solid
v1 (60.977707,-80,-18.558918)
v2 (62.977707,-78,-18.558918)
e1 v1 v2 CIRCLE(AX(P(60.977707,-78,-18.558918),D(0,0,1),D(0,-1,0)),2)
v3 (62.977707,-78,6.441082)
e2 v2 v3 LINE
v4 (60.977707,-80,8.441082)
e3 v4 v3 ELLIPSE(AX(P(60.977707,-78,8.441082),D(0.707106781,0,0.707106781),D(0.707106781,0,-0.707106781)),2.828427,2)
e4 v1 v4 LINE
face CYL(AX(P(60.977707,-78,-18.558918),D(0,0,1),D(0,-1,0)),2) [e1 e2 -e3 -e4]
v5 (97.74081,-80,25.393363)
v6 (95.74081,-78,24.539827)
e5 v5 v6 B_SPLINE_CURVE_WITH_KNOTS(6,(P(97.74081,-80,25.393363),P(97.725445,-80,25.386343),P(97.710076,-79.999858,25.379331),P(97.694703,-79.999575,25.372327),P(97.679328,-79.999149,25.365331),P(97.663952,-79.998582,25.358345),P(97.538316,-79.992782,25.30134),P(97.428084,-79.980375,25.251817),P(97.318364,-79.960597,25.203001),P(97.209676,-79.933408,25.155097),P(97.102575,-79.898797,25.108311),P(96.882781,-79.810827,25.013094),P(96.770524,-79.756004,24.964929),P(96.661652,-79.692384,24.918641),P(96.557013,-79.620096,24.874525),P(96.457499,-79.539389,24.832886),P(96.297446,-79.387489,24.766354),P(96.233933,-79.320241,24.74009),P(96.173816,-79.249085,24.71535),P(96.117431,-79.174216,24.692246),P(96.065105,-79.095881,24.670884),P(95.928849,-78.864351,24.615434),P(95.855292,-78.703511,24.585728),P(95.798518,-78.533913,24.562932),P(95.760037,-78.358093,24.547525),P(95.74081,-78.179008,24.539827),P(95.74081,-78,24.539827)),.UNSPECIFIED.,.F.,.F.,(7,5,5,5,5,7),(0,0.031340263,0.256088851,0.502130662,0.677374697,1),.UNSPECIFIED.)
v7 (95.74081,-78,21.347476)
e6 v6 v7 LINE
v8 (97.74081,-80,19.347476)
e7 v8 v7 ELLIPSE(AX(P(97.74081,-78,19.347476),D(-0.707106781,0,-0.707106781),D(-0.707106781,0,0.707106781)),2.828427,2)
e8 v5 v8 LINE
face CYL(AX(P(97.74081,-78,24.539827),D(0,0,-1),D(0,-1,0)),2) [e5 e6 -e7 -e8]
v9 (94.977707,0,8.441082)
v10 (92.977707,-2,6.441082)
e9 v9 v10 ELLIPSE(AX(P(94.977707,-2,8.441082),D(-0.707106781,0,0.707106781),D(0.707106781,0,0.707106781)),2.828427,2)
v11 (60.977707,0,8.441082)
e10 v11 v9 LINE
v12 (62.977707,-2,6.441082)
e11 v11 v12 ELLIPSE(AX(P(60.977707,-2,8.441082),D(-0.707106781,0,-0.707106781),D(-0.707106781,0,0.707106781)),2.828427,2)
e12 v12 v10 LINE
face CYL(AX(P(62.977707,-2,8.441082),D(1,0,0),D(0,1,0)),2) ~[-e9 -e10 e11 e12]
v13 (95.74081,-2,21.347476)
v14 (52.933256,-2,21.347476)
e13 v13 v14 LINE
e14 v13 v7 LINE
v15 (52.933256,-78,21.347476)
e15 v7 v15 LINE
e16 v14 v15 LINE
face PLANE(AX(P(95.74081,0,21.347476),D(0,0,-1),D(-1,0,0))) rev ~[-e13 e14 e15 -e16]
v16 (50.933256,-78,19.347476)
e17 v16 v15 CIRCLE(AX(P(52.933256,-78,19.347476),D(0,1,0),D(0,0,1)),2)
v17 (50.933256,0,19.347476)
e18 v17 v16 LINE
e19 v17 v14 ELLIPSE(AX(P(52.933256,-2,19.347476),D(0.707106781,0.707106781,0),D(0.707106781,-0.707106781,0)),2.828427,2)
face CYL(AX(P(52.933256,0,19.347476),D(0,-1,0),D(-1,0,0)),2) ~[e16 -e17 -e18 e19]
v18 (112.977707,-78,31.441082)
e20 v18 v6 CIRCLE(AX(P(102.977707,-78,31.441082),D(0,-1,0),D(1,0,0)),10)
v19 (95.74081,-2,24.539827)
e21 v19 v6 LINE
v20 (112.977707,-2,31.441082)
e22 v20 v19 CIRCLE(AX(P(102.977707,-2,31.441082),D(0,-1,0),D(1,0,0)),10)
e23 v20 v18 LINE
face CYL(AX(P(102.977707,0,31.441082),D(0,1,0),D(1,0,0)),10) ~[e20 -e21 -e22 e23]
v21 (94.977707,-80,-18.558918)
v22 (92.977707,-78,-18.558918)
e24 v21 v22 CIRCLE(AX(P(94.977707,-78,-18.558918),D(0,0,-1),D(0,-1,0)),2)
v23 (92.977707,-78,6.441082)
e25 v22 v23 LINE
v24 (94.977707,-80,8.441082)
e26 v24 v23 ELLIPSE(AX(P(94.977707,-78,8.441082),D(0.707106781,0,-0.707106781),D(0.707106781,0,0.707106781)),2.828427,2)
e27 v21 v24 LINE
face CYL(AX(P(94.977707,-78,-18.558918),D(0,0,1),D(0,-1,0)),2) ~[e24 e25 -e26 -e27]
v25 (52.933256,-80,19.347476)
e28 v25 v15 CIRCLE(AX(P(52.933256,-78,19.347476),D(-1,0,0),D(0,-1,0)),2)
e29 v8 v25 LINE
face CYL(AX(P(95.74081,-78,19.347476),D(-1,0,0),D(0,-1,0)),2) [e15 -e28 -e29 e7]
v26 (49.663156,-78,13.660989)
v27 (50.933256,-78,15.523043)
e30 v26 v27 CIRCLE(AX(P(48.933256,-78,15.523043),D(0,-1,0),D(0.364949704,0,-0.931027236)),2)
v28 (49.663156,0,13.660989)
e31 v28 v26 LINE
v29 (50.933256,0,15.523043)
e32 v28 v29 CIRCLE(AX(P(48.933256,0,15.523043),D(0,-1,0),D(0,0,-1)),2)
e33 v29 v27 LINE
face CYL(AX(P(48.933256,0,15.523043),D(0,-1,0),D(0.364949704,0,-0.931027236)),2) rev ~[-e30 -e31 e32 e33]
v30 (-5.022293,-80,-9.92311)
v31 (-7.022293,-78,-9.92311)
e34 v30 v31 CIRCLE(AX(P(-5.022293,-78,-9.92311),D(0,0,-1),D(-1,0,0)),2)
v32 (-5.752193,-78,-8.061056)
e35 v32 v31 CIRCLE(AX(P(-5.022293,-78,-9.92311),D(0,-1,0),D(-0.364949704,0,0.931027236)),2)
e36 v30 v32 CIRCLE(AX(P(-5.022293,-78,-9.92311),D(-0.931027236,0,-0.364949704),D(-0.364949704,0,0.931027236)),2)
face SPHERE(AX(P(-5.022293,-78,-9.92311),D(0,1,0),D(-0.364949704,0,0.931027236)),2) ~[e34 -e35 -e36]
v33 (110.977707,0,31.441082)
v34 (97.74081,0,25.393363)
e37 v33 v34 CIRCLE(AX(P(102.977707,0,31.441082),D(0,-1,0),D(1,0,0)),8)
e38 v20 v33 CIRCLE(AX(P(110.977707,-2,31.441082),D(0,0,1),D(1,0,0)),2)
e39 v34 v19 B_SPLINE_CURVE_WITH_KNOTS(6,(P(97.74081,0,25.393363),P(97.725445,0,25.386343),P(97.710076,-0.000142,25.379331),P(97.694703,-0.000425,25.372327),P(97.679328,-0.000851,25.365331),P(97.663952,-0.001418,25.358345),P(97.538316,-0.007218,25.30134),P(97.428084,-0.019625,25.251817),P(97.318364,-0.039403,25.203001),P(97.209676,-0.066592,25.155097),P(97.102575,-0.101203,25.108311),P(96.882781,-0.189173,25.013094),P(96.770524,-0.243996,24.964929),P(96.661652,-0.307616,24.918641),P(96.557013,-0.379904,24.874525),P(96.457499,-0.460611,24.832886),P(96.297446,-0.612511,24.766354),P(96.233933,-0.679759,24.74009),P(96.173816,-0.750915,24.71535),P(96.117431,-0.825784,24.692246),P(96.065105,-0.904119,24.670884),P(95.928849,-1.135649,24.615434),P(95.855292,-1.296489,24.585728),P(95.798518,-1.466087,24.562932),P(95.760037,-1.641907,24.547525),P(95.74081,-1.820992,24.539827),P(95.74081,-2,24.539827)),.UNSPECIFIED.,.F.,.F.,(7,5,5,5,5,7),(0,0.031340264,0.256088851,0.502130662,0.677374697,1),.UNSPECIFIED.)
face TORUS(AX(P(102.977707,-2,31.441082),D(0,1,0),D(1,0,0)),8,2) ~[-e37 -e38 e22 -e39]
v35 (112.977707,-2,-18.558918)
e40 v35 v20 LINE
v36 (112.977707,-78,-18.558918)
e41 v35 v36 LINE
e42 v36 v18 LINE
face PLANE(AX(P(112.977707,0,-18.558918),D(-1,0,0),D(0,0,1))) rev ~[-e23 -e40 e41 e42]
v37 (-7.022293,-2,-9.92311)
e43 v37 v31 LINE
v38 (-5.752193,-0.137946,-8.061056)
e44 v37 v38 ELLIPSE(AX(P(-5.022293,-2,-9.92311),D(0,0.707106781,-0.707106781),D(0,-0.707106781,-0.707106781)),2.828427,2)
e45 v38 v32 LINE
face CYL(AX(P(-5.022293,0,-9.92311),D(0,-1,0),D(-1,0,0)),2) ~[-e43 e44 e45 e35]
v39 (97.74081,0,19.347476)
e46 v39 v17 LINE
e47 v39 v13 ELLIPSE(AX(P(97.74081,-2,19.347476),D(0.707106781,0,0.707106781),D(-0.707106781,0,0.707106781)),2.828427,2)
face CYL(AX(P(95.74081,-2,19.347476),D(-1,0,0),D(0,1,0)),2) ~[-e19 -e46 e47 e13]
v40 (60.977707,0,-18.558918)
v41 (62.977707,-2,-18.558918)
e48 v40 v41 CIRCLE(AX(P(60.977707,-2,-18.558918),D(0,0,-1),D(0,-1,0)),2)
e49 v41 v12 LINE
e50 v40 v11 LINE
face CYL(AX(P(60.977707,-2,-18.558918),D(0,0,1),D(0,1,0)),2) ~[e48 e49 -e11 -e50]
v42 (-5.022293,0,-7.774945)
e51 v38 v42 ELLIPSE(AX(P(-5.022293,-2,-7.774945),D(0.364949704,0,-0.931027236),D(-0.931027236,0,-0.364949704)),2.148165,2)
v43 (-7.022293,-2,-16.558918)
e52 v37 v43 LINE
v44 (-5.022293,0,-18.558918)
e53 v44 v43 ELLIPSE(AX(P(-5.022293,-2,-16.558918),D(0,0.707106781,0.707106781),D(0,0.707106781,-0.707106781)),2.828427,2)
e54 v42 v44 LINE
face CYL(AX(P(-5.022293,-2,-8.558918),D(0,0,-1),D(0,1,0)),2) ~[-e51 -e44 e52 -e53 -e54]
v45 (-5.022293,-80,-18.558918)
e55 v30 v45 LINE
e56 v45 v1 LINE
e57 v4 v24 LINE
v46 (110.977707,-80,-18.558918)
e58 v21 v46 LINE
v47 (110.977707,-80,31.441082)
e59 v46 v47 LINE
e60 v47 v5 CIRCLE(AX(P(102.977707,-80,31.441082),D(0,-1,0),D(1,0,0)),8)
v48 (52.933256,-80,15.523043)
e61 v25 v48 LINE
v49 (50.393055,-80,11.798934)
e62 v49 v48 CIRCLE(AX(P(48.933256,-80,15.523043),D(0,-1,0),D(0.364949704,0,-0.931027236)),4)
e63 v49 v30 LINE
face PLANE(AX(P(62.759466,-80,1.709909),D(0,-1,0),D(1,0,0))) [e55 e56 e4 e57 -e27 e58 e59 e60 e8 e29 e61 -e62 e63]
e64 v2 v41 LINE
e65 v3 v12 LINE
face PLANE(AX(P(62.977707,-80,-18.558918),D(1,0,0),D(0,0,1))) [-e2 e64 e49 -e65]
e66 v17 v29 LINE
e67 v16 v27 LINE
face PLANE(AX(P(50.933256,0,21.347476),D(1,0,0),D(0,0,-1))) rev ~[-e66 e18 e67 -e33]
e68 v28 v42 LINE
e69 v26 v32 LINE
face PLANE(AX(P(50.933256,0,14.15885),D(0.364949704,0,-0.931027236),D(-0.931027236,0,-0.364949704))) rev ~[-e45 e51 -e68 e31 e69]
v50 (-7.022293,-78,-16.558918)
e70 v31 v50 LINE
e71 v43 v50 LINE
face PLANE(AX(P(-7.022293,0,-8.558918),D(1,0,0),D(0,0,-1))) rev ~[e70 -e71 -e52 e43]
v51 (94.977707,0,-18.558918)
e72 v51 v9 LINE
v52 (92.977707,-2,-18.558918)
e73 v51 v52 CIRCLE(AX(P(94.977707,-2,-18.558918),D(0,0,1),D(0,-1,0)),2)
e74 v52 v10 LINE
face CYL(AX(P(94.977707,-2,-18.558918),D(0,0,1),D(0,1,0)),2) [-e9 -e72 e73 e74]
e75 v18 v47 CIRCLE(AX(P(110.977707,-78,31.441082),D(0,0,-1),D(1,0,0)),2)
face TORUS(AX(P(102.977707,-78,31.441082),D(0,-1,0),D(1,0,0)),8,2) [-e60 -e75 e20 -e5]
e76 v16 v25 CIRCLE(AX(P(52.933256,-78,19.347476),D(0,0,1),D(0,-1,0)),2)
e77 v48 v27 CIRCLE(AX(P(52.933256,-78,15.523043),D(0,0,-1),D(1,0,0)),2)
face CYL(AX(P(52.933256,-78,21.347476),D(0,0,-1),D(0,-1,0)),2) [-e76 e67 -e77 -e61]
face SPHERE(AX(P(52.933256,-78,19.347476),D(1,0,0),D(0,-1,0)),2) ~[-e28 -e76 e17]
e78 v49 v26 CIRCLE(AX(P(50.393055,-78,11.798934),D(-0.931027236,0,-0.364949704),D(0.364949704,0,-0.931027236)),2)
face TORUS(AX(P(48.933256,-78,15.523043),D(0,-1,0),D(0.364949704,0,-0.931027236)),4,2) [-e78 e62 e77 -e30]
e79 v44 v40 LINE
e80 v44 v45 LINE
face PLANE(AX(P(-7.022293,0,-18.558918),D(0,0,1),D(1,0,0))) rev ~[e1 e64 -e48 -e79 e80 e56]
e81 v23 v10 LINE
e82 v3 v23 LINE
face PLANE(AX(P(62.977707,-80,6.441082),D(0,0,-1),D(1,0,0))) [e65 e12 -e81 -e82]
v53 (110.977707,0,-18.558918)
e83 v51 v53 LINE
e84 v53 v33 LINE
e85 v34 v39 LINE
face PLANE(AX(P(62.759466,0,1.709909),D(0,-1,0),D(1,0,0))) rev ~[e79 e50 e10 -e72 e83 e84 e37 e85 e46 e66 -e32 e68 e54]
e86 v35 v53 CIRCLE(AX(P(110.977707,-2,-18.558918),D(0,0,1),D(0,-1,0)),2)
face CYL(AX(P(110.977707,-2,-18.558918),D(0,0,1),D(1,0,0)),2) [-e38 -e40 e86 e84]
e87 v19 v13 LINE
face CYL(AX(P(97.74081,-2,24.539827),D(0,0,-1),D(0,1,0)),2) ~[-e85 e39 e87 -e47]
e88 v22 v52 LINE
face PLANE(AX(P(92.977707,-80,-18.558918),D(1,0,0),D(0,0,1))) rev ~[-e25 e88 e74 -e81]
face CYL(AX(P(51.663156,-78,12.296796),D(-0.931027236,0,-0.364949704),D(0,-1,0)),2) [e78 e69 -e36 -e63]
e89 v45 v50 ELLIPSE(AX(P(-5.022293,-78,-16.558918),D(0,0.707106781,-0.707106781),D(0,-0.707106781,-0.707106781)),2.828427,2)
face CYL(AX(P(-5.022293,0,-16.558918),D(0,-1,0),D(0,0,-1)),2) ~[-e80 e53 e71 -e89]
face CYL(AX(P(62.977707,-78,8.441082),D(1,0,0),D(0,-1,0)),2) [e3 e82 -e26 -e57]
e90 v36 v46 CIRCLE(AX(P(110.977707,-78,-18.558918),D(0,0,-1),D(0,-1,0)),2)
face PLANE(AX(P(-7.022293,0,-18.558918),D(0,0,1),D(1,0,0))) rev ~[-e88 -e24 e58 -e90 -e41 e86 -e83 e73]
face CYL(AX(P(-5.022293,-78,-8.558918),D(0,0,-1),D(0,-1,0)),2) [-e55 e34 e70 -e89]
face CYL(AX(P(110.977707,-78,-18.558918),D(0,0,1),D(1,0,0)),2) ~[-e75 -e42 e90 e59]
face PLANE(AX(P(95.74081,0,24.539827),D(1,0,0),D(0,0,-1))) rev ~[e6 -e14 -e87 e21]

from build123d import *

# Parameters (mm, degrees)
F1_DEPTH = 80
F2_W     = 30
F2_H     = 25
F3_DEPTH = 80.001
F4_R     = 2


# Not quite as in the source:
# - a feature names something its author has since deleted; it is built from what else it names


with BuildPart() as f1:
    # F0 (on Front) → F1 (new body)
    with BuildSketch(Plane.XZ):
        with BuildLine():
            Line((112.9777067155, -18.5589175671), (112.9777067155, 31.4410824329))
            ThreePointArc((112.9777067155, 31.4410824329), (99.260783713, 40.7246422778), (95.7408100367, 24.5398270065))
            Line((95.7408100367, 24.5398270065), (95.7408100367, 21.3474755859))
            Line((95.7408100367, 21.3474755859), (50.9332562928, 21.3474755859))
            Line((50.9332562928, 21.3474755859), (50.9332562928, 14.1588503625))
            Line((50.9332562928, 14.1588503625), (-7.0222932845, -8.5589175671))
            Line((-7.0222932845, -8.5589175671), (-7.0222932845, -18.5589175671))
            Line((-7.0222932845, -18.5589175671), (112.9777067155, -18.5589175671))
        make_face()
    extrude(amount=F1_DEPTH)

    # F2 (on face) → F3 (cut, through all)
    with BuildSketch(Plane.XZ.offset(80)):
        with Locations((77.9777067155, -6.0589175671)):
            Rectangle(F2_W, F2_H)
    extrude(amount=-F3_DEPTH, mode=Mode.SUBTRACT)

    # F4
    f4_edges = [f1.edges().sort_by_distance(p)[0] for p in [
        (73.337033, -80, 21.347476),
        (95.74081, -80, 22.943651),
        (99.260784, -80, 40.724642),
        (92.977707, -80, -6.058918),
        (77.977707, -80, 6.441082),
        (62.977707, -80, -6.058918),
        (50.933256, -80, 17.753163),
        (50.933256, -40, 21.347476),
        (73.337033, 0, 21.347476),
        (-7.022293, 0, -13.558918),
        (62.977707, 0, -6.058918),
        (77.977707, 0, 6.441082),
        (92.977707, 0, -6.058918),
        (95.74081, 0, 22.943651),
        (99.260784, 0, 40.724642),
        (-7.022293, -80, -13.558918),
        (-7.022293, -40, -8.558918),
        (-7.022293, -40, -18.558918),
        (50.933256, -40, 14.15885),
        (21.955482, -80, 2.799966),
        (112.977707, 0, 6.441082),
        (112.977707, -80, 6.441082),
    ]]
    fillet(f4_edges, radius=F4_R)


solid = f1.part
